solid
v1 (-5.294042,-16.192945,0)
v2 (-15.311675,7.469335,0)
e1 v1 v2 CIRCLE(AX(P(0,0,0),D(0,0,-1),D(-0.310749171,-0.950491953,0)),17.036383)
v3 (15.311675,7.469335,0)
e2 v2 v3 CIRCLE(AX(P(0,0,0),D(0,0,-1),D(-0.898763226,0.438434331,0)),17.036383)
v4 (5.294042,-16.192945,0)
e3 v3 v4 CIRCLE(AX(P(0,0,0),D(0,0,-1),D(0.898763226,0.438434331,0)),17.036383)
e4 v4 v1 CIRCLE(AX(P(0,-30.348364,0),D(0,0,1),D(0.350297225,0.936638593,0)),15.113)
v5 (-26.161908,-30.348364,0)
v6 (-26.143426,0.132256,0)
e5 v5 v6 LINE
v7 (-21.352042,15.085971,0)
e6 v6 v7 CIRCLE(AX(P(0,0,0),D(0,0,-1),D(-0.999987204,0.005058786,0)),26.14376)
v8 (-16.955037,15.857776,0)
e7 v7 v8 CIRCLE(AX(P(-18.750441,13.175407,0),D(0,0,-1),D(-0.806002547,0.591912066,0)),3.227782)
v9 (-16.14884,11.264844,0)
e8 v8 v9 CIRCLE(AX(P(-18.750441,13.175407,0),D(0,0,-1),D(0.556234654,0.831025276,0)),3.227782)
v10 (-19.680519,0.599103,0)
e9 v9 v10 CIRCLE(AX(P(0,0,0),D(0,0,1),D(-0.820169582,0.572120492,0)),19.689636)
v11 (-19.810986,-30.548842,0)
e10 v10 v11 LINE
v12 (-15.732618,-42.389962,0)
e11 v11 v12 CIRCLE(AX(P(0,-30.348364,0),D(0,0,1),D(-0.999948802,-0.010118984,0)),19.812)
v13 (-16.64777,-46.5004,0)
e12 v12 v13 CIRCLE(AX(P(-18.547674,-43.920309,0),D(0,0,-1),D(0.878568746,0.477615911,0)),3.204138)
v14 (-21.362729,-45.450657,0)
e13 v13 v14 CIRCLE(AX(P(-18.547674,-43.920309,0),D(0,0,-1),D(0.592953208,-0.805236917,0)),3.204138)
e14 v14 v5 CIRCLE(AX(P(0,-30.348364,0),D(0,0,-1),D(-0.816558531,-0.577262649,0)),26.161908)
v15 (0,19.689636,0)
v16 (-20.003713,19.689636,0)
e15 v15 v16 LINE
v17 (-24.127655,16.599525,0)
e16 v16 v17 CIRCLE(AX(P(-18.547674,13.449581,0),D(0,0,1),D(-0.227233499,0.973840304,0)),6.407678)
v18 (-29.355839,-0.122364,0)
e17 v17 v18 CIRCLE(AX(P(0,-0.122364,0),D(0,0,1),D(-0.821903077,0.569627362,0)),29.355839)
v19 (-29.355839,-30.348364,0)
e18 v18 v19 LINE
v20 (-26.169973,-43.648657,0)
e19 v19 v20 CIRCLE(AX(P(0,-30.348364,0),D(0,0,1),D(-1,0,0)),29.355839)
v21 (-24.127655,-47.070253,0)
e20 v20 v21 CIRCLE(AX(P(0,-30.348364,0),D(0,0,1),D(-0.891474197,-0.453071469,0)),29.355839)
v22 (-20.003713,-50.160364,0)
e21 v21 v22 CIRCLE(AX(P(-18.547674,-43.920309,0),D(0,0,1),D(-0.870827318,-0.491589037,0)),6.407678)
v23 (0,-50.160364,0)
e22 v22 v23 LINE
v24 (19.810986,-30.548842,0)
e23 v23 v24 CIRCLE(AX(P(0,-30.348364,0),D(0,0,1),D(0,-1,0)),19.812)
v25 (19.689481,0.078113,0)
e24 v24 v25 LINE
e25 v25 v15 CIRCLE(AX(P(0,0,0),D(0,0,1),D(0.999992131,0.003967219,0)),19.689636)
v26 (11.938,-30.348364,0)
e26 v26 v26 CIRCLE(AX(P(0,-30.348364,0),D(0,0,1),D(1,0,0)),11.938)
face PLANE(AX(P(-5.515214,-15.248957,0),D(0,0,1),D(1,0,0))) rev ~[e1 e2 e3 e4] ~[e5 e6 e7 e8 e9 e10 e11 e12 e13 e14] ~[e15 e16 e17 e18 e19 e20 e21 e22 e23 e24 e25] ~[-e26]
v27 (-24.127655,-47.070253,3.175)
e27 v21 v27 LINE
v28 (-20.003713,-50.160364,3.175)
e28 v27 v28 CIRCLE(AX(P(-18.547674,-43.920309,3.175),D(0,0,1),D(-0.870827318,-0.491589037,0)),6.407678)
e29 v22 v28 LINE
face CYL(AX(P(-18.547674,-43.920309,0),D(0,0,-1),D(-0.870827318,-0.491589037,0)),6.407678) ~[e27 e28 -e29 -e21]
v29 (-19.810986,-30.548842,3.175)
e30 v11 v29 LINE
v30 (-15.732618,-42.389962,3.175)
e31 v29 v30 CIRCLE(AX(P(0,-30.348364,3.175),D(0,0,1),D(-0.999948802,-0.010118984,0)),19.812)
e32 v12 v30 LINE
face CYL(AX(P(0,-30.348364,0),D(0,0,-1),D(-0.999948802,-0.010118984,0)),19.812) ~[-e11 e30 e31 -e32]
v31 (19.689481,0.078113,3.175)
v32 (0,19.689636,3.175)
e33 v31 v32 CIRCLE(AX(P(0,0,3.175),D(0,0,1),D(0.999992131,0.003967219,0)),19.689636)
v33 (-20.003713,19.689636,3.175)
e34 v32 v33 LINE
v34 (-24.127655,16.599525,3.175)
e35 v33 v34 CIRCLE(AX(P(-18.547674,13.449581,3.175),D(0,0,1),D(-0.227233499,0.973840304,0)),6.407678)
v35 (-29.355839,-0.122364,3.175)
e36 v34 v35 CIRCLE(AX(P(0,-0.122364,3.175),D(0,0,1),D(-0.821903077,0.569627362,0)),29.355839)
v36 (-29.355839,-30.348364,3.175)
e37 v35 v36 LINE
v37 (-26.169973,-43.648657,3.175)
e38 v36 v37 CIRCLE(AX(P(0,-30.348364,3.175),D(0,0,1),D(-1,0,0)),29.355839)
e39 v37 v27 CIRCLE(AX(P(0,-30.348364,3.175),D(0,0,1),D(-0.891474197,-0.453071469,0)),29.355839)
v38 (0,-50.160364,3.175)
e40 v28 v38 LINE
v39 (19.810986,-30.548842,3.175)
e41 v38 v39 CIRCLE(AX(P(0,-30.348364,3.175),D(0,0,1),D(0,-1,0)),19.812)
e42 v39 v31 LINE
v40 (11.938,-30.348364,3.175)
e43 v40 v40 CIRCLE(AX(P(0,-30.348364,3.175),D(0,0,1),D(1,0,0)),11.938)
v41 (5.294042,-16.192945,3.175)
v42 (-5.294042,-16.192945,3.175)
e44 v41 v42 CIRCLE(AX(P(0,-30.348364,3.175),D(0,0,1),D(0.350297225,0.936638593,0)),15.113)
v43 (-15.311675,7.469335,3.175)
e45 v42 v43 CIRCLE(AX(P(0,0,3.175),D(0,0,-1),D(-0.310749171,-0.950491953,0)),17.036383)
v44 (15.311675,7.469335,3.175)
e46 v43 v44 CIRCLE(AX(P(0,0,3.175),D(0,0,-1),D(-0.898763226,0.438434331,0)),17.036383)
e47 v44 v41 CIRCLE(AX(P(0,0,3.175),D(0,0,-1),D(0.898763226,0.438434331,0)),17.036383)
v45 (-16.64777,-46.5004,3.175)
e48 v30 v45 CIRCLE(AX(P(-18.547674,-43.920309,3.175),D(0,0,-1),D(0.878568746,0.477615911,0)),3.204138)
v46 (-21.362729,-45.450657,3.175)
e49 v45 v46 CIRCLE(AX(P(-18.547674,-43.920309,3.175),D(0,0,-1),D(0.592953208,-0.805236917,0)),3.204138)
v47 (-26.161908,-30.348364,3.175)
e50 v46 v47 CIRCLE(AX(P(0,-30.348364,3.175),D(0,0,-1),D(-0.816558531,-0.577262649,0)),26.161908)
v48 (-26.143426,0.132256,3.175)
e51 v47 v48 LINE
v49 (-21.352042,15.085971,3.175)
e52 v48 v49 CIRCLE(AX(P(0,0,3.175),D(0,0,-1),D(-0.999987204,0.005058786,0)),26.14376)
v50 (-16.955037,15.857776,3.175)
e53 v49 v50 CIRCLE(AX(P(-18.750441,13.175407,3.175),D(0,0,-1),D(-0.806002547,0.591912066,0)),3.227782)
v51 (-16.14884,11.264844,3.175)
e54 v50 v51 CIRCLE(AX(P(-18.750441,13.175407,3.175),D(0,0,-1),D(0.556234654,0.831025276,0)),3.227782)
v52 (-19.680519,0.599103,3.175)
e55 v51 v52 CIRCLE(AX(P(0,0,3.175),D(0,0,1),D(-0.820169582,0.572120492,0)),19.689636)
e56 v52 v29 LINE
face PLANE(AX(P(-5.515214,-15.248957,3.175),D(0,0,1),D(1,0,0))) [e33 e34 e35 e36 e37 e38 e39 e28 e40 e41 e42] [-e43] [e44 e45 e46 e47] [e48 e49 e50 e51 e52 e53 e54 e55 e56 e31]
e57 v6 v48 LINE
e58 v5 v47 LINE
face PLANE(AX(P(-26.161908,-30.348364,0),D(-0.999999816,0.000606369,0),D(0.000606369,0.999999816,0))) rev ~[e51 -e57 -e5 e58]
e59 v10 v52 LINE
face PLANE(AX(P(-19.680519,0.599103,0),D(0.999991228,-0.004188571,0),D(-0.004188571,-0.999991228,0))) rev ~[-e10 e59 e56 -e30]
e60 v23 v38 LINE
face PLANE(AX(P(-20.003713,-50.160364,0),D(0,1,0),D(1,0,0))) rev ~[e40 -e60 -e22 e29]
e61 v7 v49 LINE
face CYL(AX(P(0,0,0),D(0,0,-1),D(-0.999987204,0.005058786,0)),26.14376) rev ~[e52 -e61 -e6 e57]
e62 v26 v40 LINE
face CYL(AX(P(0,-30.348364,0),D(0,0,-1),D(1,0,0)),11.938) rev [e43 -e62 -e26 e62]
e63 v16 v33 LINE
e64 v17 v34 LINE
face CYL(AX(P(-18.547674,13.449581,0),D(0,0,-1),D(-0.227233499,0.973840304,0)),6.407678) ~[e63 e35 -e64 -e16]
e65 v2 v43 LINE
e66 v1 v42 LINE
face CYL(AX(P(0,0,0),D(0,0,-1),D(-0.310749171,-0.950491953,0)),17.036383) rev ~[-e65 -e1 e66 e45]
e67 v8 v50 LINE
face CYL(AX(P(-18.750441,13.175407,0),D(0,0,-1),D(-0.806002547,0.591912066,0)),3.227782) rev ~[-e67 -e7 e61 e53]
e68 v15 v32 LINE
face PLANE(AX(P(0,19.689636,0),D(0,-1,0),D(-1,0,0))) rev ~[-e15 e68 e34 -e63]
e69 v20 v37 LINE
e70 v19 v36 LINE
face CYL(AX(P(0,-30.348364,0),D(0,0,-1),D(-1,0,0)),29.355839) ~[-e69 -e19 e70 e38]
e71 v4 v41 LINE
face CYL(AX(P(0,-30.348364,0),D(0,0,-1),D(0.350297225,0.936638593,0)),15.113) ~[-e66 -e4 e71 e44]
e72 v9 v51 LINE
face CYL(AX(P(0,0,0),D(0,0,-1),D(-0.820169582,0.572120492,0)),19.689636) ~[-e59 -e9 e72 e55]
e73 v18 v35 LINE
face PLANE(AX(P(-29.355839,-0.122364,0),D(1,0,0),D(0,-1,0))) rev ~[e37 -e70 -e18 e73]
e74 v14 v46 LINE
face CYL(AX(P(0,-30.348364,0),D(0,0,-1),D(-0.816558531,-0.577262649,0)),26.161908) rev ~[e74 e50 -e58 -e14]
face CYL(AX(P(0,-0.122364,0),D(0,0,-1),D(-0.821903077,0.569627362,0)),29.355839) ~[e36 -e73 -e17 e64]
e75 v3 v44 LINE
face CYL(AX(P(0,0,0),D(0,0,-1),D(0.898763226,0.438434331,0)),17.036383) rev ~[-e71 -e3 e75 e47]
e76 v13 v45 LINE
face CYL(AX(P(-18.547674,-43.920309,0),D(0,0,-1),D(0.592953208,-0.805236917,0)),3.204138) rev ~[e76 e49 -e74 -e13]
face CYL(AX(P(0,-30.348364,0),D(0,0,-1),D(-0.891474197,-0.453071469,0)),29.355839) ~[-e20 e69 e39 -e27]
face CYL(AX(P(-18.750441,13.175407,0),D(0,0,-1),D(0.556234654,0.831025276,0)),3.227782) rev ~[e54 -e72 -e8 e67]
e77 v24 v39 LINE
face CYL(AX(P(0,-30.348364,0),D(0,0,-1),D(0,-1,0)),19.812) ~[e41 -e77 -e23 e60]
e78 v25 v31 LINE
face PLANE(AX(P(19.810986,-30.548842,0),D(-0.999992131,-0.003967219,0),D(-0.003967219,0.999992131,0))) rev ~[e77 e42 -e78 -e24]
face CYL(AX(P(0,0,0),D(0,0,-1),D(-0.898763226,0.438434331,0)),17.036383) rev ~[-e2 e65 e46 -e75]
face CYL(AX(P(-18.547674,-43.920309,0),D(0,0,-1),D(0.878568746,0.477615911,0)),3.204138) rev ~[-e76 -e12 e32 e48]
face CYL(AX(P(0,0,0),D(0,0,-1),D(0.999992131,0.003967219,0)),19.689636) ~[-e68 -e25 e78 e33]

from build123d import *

# Parameters (mm, degrees)
F0_R     = 11.938
F1_DEPTH = 3.175


# Not quite as in the source:
# - a feature names something its author has since deleted; it is built from what else it names


with BuildPart() as f1:
    # F0 (on Top) → F1 (new body)
    with BuildSketch(Plane.XY):
        with BuildLine():
            ThreePointArc((19.6894808556, 0.0781131055), (13.8950303962, 13.9502648114), (0, 19.6896358021))
            Line((0, 19.6896358021), (-20.0037127642, 19.6896358021))
            ThreePointArc((-20.0037127642, 19.6896358021), (-22.390015477, 18.5774210568), (-24.1276545988, 16.5995250638))
            ThreePointArc((-24.1276545988, 16.5995250638), (-28.0183229898, 8.6377085048), (-29.3558392303, -0.1223641979))
            Line((-29.3558392303, -0.1223641979), (-29.3558392303, -30.3483641979))
            ThreePointArc((-29.3558392303, -30.3483641979), (-28.5482645978, -37.1866304526), (-26.1699732087, -43.6486573967))
            ThreePointArc((-26.1699732087, -43.6486573967), (-25.2069369553, -45.3941485327), (-24.1276545988, -47.0702534596))
            ThreePointArc((-24.1276545988, -47.0702534596), (-22.390015477, -49.0481494526), (-20.0037127642, -50.1603641979))
            Line((-20.0037127642, -50.1603641979), (0, -50.1603641979))
            ThreePointArc((0, -50.1603641979), (13.9381398986, -44.4282647716), (19.8109856608, -30.5488415012))
            Line((19.8109856608, -30.5488415012), (19.6894808556, 0.0781131055))
        make_face()
        with BuildLine():
            Line((-19.6805191444, 0.5991028516), (-19.8109856608, -30.5488415012))
            ThreePointArc((-19.8109856608, -30.5488415012), (-18.7320573688, -36.8001368793), (-15.7326179982, -42.3899618877))
            ThreePointArc((-15.7326179982, -42.3899618877), (-15.4201129826, -44.616632299), (-16.6477696645, -46.5003996883))
            ThreePointArc((-16.6477696645, -46.5003996883), (-19.2439967199, -47.0478700205), (-21.3627294259, -45.4506566945))
            ThreePointArc((-21.3627294259, -45.4506566945), (-24.9332630835, -38.2716109559), (-26.1619083245, -30.3483641979))
            Line((-26.1619083245, -30.3483641979), (-26.1434258244, 0.1322556929))
            ThreePointArc((-26.1434258244, 0.1322556929), (-24.8969528592, 7.9773393892), (-21.3520418939, 15.0859707133))
            ThreePointArc((-21.3520418939, 15.0859707133), (-19.3084814881, 16.3545849229), (-16.9550367483, 15.8577761045))
            ThreePointArc((-16.9550367483, 15.8577761045), (-15.5712636207, 13.7334477776), (-16.1488403601, 11.2648441198))
            ThreePointArc((-16.1488403601, 11.2648441198), (-18.6915825929, 6.1892243613), (-19.6805191444, 0.5991028516))
        make_face(mode=Mode.SUBTRACT)
        with Locations((0, -30.3483641979)):
            Circle(F0_R, mode=Mode.SUBTRACT)
        with BuildLine():
            ThreePointArc((-15.3116747346, 7.469335274), (0, 17.0363832022), (15.3116747346, 7.469335274))
            ThreePointArc((15.3116747346, 7.469335274), (15.6883641196, -6.6418057683), (5.2940419625, -16.1929451402))
            ThreePointArc((5.2940419625, -16.1929451402), (0, -15.2353641979), (-5.2940419625, -16.1929451402))
            ThreePointArc((-5.2940419625, -16.1929451402), (-15.6883641196, -6.6418057683), (-15.3116747346, 7.469335274))
        make_face(mode=Mode.SUBTRACT)
    extrude(amount=F1_DEPTH)


solid = f1.part
